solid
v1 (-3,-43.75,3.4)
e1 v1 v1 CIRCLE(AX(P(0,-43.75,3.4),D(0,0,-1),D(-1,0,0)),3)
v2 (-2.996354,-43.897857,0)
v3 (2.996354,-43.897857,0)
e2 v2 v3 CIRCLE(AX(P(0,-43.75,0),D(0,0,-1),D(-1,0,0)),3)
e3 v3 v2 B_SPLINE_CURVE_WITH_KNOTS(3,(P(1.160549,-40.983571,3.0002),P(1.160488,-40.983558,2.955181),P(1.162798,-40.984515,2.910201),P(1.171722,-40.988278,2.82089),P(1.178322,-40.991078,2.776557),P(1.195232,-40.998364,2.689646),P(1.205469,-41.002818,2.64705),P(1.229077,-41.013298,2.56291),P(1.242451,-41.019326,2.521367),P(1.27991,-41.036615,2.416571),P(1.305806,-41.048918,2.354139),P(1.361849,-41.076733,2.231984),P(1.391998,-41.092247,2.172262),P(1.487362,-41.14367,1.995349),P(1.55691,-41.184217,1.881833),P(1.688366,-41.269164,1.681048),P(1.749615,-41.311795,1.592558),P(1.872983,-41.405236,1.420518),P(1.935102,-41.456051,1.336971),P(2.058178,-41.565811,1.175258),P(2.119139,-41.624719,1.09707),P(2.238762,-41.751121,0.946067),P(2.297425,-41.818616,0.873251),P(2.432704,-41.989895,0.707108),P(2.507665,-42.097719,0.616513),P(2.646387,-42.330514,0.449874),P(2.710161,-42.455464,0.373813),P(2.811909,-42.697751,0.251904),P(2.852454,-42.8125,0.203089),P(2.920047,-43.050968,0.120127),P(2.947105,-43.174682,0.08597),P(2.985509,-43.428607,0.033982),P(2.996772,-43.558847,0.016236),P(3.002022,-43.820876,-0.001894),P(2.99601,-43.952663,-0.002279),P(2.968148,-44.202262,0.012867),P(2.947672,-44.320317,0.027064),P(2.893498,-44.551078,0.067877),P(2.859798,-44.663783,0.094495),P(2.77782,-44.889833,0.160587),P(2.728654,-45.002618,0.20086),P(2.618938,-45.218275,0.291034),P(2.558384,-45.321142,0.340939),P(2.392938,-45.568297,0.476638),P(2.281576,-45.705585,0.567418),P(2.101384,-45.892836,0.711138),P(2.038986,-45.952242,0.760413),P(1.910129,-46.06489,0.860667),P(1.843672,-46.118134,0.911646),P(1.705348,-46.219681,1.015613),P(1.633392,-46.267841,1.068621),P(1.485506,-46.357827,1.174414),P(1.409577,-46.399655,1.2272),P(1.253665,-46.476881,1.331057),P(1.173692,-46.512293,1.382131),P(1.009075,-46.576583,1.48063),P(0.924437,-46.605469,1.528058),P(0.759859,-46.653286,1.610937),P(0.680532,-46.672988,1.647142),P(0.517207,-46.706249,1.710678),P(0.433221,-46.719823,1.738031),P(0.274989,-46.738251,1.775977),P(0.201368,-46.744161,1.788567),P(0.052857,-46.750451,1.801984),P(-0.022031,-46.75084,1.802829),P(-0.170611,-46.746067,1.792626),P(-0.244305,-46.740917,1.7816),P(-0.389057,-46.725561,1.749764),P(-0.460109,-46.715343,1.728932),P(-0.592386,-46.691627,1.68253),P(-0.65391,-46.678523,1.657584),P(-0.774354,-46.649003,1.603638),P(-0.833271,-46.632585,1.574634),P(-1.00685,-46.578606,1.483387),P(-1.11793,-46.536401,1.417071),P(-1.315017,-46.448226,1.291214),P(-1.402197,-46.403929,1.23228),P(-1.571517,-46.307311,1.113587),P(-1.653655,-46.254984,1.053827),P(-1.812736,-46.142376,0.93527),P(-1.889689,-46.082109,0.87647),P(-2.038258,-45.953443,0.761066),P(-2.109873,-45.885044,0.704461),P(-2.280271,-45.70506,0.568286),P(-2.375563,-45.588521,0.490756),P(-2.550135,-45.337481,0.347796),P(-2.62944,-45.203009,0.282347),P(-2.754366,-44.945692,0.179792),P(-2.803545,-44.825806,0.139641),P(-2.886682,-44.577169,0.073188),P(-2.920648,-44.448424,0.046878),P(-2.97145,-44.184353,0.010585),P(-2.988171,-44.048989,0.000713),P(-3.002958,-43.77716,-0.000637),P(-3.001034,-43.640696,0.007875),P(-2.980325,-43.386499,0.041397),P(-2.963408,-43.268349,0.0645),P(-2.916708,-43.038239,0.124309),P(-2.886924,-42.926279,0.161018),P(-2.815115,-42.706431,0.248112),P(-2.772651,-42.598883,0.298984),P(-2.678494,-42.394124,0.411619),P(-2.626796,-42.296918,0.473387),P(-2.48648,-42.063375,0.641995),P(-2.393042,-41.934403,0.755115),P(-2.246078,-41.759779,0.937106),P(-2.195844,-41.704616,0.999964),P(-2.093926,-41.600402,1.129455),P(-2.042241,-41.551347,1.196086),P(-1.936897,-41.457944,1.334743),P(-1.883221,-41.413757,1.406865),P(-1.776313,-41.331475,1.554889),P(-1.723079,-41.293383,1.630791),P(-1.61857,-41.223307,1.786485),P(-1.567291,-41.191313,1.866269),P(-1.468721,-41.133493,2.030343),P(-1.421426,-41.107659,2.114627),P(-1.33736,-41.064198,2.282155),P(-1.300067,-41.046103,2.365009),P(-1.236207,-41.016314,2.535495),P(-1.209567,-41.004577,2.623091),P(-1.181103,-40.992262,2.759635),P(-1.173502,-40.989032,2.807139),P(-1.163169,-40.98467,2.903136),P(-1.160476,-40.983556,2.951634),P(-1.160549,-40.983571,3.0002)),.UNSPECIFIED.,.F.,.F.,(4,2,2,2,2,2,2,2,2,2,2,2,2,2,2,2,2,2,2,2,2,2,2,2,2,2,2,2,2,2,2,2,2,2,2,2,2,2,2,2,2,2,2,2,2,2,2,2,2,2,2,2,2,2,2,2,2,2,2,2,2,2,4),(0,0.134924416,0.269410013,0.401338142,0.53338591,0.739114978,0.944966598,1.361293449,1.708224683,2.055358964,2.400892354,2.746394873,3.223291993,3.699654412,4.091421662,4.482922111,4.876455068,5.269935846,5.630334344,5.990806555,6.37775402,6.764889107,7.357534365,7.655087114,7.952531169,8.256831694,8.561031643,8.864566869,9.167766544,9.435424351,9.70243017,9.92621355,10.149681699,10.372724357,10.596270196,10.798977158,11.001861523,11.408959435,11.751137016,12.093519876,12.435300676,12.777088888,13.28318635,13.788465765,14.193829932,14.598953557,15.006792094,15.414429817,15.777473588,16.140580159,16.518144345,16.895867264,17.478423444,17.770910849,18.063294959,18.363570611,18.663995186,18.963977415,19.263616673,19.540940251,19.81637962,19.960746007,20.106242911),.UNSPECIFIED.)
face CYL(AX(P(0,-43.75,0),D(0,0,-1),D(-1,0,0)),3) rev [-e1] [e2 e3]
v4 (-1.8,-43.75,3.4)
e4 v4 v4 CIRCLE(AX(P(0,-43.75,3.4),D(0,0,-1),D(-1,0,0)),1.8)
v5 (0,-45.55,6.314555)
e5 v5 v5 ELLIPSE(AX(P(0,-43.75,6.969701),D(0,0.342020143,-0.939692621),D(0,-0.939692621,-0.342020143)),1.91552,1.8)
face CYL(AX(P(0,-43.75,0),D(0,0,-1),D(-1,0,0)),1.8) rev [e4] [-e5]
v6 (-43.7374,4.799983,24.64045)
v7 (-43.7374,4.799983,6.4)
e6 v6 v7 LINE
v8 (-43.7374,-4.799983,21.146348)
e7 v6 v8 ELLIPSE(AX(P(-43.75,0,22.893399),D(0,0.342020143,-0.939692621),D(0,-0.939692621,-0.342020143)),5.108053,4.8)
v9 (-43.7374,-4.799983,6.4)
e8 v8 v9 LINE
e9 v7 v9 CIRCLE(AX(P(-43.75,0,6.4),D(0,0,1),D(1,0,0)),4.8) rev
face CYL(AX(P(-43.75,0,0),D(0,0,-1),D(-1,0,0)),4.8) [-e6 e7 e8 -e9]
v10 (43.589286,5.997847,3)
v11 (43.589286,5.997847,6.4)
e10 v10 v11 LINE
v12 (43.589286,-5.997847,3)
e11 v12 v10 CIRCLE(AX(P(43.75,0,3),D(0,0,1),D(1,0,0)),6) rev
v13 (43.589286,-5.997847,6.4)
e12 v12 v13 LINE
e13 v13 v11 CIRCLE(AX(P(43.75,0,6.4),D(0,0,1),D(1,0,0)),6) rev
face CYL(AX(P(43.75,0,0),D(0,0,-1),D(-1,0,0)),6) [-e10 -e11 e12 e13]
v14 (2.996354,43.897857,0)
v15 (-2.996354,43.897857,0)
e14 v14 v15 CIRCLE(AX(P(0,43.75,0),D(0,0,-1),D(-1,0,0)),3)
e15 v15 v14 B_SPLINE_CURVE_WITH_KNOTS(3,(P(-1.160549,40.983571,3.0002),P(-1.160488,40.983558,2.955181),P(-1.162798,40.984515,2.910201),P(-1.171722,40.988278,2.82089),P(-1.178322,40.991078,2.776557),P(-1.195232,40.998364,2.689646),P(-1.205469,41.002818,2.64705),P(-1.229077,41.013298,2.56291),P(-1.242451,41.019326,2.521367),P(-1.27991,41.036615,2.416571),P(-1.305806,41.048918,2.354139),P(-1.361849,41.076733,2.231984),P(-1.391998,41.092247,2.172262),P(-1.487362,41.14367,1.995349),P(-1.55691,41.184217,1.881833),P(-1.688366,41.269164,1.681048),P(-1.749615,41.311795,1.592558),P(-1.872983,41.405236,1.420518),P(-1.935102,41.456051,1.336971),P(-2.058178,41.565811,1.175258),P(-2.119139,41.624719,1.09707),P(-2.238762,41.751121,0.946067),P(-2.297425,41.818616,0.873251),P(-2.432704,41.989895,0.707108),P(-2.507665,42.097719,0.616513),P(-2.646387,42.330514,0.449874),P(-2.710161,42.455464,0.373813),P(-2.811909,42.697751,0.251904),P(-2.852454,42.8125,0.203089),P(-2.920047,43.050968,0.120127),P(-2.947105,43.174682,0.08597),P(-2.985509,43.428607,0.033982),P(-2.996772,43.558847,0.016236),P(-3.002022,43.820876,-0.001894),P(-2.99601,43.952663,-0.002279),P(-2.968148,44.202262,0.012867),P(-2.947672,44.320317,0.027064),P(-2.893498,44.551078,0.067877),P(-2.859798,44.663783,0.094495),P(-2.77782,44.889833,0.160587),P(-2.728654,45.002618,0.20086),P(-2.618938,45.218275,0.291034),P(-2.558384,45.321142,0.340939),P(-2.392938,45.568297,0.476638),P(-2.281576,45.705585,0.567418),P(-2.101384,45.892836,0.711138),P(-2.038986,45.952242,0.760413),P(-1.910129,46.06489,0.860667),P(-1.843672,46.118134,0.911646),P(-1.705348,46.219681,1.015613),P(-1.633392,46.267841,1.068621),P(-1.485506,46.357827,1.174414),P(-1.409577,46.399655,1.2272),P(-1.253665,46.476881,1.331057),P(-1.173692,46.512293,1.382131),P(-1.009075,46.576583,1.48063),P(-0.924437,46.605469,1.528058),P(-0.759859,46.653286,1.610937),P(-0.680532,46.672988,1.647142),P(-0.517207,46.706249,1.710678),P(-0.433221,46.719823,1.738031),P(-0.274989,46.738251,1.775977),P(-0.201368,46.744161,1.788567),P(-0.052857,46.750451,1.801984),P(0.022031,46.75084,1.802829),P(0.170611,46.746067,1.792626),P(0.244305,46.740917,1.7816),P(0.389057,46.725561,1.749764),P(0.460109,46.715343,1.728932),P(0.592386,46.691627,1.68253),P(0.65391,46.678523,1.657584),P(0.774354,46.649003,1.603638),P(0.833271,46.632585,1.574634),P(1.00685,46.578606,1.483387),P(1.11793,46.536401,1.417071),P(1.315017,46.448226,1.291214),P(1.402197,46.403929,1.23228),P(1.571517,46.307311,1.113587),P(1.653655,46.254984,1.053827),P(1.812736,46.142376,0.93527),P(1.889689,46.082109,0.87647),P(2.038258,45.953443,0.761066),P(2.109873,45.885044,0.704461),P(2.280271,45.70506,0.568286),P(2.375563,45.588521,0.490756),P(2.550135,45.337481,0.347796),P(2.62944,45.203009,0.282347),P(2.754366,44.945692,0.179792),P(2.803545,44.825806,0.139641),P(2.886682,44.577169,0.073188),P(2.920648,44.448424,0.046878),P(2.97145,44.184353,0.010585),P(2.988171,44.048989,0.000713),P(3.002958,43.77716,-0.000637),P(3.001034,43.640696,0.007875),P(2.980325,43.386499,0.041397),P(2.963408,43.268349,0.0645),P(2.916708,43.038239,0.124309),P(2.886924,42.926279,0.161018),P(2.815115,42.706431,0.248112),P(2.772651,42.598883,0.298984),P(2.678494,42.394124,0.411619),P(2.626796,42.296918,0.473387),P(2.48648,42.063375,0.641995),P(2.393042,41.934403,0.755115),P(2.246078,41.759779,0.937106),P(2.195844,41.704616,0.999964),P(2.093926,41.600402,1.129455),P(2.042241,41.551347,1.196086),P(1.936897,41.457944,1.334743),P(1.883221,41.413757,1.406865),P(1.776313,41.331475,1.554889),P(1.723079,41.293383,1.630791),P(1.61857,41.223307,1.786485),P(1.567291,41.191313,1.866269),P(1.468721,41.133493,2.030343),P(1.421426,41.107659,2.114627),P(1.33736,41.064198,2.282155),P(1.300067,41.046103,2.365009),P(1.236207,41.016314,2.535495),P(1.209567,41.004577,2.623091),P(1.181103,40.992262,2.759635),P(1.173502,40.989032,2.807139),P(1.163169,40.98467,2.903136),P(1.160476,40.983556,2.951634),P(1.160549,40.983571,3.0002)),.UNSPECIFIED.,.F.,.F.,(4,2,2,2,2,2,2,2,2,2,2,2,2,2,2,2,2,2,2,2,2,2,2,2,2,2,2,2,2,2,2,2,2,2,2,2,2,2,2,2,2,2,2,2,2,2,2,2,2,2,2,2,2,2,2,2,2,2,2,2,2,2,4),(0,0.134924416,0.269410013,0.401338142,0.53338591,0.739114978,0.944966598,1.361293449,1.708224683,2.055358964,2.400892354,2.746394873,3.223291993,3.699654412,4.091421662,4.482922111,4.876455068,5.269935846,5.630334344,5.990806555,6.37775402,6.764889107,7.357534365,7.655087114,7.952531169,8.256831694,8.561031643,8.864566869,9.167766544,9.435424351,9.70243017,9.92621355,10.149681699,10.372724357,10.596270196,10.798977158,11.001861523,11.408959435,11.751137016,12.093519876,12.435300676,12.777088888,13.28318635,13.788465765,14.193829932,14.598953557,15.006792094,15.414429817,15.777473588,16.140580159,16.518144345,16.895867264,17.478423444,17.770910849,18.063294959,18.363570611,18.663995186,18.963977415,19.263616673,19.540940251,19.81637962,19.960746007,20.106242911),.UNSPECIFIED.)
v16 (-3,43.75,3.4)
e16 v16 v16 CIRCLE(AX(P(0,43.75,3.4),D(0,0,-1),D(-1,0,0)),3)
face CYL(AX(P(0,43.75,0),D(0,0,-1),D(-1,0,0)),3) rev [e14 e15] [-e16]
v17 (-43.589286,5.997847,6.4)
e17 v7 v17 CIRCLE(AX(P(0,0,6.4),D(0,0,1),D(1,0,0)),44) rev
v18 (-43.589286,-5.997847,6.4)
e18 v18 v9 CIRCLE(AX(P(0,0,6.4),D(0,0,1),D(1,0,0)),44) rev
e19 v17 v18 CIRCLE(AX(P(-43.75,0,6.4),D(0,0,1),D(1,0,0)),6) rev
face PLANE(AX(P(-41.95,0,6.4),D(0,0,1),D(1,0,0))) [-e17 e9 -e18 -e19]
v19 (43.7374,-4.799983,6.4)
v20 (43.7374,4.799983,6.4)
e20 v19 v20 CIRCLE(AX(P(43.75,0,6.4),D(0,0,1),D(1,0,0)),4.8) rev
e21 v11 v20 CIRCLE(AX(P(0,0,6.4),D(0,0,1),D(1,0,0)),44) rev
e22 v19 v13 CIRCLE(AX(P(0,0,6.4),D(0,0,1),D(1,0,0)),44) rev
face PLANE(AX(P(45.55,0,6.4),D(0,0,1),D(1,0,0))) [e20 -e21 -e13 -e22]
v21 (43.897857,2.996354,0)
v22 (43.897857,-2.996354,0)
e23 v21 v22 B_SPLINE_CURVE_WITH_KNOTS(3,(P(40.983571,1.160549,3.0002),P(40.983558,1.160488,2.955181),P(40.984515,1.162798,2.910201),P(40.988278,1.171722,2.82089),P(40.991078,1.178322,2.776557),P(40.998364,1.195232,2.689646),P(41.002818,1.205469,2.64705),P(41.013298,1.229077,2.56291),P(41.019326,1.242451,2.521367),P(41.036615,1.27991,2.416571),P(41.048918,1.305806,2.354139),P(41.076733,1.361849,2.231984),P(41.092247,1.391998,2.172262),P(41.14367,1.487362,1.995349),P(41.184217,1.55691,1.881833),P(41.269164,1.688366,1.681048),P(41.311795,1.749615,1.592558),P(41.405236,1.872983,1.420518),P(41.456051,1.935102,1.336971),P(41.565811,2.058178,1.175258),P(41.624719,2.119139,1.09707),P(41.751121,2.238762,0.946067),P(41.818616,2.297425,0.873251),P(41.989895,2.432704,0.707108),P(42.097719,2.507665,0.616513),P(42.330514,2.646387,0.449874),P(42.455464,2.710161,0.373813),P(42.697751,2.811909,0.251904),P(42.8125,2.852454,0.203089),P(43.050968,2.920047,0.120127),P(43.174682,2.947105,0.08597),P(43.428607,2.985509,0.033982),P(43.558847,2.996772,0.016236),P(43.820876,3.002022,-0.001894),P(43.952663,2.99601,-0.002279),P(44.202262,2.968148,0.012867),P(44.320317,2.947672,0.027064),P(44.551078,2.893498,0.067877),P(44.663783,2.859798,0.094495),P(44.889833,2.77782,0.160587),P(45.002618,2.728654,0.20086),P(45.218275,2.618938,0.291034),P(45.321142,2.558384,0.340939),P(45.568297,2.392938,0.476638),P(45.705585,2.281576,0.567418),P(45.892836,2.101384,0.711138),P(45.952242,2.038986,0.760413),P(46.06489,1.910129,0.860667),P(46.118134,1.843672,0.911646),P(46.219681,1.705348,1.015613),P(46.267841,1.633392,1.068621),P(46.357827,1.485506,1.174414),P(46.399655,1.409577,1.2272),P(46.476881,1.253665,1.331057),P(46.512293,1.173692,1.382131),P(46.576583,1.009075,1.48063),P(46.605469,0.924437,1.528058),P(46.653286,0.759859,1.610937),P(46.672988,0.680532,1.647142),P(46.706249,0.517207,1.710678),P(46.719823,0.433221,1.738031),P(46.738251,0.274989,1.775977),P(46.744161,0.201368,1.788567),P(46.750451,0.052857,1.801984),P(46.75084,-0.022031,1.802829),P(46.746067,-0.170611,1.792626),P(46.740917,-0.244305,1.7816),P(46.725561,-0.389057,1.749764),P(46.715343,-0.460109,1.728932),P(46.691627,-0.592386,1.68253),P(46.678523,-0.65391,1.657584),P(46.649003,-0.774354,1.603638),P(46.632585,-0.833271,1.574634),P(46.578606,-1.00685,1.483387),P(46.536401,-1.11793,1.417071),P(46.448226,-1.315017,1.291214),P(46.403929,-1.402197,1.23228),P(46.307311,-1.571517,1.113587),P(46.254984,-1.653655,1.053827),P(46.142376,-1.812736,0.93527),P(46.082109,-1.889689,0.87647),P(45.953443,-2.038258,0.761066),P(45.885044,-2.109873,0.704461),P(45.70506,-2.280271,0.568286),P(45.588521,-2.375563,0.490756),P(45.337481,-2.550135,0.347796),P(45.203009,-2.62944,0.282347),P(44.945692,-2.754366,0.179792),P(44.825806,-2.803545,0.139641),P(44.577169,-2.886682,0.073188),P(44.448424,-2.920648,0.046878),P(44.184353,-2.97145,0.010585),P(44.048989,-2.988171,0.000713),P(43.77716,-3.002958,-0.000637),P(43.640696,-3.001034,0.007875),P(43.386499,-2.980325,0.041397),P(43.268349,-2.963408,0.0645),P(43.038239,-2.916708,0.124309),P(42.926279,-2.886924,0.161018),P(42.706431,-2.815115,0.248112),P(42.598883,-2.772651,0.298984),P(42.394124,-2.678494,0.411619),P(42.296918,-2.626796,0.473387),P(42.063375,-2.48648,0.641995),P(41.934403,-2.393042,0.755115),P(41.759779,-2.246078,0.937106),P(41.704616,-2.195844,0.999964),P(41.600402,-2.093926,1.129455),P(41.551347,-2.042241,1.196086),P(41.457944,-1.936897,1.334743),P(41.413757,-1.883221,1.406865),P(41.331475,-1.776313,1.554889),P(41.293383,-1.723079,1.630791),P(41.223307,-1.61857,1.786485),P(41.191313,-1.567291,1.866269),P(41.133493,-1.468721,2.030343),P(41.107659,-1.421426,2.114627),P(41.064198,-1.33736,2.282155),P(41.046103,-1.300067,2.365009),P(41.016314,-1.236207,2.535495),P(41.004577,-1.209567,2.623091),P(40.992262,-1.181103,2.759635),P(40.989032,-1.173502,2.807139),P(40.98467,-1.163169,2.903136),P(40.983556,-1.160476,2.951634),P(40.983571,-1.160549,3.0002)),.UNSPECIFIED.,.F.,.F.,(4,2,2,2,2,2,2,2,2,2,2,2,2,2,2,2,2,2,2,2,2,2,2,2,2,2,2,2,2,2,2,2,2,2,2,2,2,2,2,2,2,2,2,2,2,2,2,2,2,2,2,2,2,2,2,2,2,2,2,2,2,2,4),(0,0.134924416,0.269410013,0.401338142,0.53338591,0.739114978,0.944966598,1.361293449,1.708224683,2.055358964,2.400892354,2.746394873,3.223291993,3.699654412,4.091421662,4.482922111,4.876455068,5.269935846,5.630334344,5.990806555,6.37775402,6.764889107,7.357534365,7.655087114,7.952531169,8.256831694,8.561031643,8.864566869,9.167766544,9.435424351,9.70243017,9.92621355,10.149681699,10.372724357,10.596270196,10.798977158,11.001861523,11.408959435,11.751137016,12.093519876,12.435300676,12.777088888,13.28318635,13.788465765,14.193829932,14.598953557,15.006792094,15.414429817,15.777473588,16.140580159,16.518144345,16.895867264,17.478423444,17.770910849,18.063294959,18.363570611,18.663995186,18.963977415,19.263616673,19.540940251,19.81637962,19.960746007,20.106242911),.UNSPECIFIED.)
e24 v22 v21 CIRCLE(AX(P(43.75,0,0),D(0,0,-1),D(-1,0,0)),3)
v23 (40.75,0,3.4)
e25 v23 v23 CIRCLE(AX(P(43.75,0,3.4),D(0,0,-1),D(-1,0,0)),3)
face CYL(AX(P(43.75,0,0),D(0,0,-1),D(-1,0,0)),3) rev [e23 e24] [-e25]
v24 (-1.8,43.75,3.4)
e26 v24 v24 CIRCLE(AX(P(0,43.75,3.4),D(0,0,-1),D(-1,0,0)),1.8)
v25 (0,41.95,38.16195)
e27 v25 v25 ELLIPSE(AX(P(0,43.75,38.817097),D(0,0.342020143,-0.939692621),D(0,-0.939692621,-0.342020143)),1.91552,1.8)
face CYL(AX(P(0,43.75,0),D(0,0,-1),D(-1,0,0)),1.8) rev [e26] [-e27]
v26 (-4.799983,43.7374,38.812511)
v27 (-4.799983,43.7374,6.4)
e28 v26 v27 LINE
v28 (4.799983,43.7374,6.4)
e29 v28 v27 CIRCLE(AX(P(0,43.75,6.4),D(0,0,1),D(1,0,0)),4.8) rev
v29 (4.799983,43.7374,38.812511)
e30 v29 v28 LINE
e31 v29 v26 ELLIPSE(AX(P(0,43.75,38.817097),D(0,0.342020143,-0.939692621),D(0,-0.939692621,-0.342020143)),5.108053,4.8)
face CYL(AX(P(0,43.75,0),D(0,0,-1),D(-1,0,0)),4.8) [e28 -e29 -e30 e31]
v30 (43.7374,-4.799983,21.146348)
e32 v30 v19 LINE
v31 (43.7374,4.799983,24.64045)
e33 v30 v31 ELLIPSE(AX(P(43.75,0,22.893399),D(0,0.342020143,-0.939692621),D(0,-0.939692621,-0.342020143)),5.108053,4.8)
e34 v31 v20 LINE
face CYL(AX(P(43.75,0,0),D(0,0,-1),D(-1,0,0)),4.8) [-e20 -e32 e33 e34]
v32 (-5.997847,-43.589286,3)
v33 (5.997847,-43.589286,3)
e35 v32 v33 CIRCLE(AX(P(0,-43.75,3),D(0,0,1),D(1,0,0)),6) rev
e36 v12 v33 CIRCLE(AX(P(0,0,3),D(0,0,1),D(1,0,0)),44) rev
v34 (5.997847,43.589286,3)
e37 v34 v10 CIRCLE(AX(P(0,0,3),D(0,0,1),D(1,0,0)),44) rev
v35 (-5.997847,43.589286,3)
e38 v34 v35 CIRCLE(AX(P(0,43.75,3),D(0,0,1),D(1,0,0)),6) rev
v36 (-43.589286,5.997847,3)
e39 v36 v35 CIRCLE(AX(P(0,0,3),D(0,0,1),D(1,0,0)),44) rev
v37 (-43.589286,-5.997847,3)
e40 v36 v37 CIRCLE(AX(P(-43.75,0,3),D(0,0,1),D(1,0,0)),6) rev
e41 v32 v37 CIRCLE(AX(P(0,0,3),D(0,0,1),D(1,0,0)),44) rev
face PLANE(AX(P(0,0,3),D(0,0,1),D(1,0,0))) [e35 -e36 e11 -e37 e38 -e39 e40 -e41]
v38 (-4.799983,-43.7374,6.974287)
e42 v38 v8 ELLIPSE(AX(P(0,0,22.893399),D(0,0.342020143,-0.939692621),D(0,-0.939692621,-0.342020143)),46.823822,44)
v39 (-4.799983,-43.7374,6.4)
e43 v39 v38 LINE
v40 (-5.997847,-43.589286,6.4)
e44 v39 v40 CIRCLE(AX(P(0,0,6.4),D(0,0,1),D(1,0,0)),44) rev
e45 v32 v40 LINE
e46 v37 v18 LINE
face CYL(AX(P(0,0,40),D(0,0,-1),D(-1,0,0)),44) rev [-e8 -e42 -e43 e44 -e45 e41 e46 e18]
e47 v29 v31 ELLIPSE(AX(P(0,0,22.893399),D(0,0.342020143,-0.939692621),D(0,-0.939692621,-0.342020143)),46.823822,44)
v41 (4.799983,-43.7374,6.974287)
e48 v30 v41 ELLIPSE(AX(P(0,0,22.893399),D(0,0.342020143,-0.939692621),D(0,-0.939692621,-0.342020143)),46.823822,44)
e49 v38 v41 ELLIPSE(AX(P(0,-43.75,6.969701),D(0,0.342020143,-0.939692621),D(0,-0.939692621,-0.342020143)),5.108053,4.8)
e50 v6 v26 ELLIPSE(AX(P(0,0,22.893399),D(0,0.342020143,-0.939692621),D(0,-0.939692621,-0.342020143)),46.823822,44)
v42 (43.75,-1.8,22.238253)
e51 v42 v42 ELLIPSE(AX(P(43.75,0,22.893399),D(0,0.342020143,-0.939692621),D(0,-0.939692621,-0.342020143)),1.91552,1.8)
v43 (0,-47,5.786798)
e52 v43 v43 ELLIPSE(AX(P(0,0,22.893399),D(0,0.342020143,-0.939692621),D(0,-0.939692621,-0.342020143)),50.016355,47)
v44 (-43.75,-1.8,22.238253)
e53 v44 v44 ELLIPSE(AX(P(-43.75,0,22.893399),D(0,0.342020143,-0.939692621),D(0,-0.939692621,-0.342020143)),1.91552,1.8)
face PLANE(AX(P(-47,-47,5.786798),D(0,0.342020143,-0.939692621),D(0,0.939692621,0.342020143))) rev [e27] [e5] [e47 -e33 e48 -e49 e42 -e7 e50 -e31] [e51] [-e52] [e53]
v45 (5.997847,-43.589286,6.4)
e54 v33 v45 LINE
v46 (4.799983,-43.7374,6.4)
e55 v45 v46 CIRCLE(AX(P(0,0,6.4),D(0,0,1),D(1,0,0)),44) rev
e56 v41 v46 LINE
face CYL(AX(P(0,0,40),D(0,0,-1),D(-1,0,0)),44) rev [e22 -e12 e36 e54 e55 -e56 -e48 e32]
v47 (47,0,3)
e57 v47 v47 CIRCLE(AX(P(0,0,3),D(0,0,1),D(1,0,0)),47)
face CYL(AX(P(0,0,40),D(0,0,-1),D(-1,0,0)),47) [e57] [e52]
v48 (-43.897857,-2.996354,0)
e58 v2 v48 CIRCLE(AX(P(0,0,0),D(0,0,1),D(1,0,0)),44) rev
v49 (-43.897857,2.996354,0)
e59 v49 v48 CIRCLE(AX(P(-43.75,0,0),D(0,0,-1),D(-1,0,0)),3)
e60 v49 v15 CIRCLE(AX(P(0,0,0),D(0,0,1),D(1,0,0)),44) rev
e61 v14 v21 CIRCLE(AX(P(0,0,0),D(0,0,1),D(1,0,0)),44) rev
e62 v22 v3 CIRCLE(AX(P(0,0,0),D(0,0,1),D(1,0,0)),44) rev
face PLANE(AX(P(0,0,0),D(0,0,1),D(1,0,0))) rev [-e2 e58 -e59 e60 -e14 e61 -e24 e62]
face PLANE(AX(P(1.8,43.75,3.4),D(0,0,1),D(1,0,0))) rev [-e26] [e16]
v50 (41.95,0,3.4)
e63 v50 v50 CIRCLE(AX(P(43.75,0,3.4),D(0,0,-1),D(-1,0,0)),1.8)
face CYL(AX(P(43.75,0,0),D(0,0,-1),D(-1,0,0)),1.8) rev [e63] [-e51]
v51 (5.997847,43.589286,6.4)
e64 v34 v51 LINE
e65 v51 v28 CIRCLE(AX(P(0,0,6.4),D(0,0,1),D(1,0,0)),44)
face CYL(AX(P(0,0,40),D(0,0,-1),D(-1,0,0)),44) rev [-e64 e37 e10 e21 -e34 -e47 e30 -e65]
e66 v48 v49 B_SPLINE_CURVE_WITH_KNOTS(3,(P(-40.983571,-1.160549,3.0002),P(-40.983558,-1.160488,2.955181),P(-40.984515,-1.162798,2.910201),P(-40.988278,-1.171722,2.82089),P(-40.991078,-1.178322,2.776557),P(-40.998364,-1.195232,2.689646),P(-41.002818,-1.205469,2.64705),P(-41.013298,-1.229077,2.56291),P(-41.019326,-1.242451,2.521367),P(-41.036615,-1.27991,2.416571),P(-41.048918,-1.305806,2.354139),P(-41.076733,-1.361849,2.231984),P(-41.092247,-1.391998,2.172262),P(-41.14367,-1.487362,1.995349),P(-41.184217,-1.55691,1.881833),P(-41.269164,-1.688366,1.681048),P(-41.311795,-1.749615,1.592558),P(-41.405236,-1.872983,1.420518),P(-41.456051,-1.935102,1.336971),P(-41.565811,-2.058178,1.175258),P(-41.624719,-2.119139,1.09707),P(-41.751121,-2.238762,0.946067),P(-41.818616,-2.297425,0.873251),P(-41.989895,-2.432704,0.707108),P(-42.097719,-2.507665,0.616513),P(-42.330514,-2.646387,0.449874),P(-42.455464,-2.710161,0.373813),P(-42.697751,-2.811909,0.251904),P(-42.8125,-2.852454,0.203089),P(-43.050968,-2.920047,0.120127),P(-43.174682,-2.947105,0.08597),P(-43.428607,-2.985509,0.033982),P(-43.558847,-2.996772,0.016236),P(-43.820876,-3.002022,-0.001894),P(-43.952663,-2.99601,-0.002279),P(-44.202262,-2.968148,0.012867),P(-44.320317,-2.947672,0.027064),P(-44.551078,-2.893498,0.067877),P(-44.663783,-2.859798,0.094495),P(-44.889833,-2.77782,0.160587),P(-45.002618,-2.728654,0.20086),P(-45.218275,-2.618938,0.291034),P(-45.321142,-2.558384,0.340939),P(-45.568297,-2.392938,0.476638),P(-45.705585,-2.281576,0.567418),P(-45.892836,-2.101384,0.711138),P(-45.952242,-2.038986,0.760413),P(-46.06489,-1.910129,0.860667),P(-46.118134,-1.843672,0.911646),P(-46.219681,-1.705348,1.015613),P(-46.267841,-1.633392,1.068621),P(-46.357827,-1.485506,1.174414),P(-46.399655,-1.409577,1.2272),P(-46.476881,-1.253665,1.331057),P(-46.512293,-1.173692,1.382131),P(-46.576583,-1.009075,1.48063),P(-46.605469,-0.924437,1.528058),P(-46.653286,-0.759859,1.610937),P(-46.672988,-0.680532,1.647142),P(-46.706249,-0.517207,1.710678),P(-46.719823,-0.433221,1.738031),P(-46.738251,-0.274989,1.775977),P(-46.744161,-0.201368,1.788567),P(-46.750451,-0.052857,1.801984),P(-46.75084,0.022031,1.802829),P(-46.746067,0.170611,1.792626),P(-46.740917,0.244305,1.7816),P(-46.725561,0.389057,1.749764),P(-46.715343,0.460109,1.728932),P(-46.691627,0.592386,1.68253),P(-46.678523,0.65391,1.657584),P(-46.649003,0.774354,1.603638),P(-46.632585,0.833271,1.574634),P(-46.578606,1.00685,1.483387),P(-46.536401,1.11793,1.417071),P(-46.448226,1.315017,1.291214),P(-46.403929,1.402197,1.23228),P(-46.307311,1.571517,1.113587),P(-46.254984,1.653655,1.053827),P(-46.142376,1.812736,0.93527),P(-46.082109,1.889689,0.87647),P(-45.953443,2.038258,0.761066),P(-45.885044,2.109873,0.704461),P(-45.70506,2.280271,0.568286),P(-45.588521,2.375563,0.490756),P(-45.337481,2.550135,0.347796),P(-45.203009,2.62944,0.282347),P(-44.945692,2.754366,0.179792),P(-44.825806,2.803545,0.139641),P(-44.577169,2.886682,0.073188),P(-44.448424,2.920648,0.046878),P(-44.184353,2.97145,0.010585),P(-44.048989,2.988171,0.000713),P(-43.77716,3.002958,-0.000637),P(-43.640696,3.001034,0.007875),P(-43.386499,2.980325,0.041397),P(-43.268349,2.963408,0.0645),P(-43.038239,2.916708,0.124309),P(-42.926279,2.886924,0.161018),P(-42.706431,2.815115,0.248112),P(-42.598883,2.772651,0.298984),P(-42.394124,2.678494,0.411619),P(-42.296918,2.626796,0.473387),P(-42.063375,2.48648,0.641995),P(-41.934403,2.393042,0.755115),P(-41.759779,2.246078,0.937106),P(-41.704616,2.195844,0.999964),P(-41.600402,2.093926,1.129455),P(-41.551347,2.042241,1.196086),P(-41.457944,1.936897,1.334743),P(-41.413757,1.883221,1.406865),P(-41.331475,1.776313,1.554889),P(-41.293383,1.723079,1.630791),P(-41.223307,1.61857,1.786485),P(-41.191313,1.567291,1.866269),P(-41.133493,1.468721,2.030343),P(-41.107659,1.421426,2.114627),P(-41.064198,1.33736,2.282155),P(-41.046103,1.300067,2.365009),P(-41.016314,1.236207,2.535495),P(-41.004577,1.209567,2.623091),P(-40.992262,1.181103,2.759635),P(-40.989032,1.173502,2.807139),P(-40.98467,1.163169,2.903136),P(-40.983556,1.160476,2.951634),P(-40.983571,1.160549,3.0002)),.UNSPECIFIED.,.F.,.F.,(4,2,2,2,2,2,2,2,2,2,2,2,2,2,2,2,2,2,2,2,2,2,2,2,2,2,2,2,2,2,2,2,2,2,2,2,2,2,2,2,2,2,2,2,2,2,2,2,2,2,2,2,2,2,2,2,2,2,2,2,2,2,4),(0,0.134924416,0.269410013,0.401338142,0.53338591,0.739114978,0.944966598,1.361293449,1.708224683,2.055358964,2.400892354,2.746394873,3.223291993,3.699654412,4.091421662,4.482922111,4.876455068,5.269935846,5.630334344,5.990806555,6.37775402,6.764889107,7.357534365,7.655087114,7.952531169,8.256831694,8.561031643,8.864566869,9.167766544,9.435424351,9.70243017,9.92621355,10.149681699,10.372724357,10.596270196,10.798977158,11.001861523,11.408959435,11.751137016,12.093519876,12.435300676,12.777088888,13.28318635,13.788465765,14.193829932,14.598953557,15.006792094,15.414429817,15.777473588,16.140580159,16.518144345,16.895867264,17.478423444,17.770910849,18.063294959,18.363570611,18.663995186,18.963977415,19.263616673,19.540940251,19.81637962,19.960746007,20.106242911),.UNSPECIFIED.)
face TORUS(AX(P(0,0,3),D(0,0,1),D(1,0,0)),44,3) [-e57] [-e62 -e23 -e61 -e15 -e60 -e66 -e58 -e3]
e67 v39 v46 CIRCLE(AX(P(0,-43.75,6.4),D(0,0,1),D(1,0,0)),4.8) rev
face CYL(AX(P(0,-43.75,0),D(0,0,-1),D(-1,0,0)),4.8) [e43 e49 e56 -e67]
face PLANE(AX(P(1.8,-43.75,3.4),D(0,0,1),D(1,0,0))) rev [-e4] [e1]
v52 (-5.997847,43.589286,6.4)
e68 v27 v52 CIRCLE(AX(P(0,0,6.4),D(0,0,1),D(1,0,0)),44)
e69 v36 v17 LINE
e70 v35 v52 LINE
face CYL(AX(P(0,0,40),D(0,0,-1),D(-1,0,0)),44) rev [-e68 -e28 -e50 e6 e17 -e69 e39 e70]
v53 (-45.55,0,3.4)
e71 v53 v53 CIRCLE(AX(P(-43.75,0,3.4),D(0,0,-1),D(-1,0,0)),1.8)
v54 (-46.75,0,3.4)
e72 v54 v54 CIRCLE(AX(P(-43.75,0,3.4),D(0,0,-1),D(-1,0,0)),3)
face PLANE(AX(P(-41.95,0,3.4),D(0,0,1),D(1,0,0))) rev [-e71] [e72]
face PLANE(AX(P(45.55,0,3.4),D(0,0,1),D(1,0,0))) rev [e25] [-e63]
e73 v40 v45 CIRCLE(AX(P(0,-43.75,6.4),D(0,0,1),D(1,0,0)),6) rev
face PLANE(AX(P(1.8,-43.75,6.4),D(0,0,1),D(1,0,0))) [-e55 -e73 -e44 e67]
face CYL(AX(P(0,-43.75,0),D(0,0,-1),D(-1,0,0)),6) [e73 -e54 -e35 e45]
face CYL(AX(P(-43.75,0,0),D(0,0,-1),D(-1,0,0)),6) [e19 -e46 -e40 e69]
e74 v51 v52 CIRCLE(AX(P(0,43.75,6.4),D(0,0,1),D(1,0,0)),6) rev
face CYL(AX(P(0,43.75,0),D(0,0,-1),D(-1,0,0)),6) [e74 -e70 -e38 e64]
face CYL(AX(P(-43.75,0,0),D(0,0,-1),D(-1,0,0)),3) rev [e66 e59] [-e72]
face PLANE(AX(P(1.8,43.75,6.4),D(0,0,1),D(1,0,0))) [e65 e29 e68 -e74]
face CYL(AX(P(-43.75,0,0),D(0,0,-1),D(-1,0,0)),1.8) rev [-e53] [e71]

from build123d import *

# Parameters (mm, degrees)
SKETCH_1_R                = 47
EXTRUDE_1_DEPTH           = 40
CUT_EXTRUDE_1_DEPTH       = 78.575769413
CUT_EXTRUDE_1_DEPTH_BACK  = 78.575769413
FILLET_1_R                = 3
HOLE_WIZARD_1_D           = 3.6
HOLE_WIZARD_1_CBORE_D     = 6
HOLE_WIZARD_1_CBORE_DEPTH = 3.4
PATTERN_CIRCULAR_1_COUNT  = 4
SHELL_START               = 3
SHELL_1_DEPTH             = 35.812510714
SHELL_START_2             = 6.4
SHELL_1_2_DEPTH           = 32.412510714


# Read off the part's stored shape, not the designer's step: 抽壳1
with BuildPart() as part:
    # 草图1 → 凸台-拉伸1 (new body)
    with BuildSketch(Plane.XY):
        Circle(SKETCH_1_R)
    extrude(amount=EXTRUDE_1_DEPTH)

    # 草图2 → 切除-拉伸1 (cut, two sides: drawn at the far end of the back side and taken through both)
    with BuildSketch(Plane(origin=(0, 0, 0), x_dir=(0, 0, -1), z_dir=(1, 0, 0)).offset(-CUT_EXTRUDE_1_DEPTH_BACK)):
        Polygon((-40, 47), (-40, -47), (-5.786797979, -47), align=None)
    extrude(amount=CUT_EXTRUDE_1_DEPTH + CUT_EXTRUDE_1_DEPTH_BACK, mode=Mode.SUBTRACT)

    # 圆角1
    fillet_1_edges = [part.edges().sort_by_distance(p)[0] for p in [
        (-47, 0, 0),
    ]]
    fillet(fillet_1_edges, radius=FILLET_1_R)

    # 打孔尺寸(%根据)内六角圆柱头螺钉的类型1 (through all)
    with Locations(Plane(origin=(0, 0, 0), x_dir=(-1, 0, 0), z_dir=(0, 0, -1))):
        with Locations((0, 43.75)):
            hole_wizard_1 = CounterBoreHole(HOLE_WIZARD_1_D / 2, HOLE_WIZARD_1_CBORE_D / 2, HOLE_WIZARD_1_CBORE_DEPTH)

    # 阵列(圆周)1: 打孔尺寸(%根据)内六角圆柱头螺钉的类型1 ×4 about axis
    pattern_circular_1_axis = Axis((0, 0, 0), (0, 0, 1))
    for i in range(1, PATTERN_CIRCULAR_1_COUNT):
        add(hole_wizard_1.rotate(pattern_circular_1_axis, i * 360 / PATTERN_CIRCULAR_1_COUNT), mode=Mode.SUBTRACT)

    # 抽壳1 outline → 抽壳1 (cut)
    with BuildSketch(Plane.XY.offset(SHELL_START)):
        with BuildLine():
            ThreePointArc((-43.589285714, -5.99784719), (-31.112698372, -31.112698372), (-5.99784719, -43.589285714))
            ThreePointArc((-5.99784719, -43.589285714), (0, -37.75), (5.99784719, -43.589285714))
            ThreePointArc((5.99784719, -43.589285714), (31.112698372, -31.112698372), (43.589285714, -5.99784719))
            ThreePointArc((43.589285714, -5.99784719), (37.75, 0), (43.589285714, 5.99784719))
            ThreePointArc((43.589285714, 5.99784719), (31.112698372, 31.112698372), (5.99784719, 43.589285714))
            ThreePointArc((5.99784719, 43.589285714), (0, 37.75), (-5.99784719, 43.589285714))
            ThreePointArc((-5.99784719, 43.589285714), (-31.112698372, 31.112698372), (-43.589285714, 5.99784719))
            ThreePointArc((-43.589285714, 5.99784719), (-37.75, 0), (-43.589285714, -5.99784719))
        make_face()
    extrude(amount=SHELL_1_DEPTH, mode=Mode.SUBTRACT)

    # Shell 1 2 outline → Shell 1 2 (cut)
    with BuildSketch(Plane.XY.offset(SHELL_START_2)):
        with BuildLine():
            ThreePointArc((5.99784719, -43.589285714), (0, -37.75), (-5.99784719, -43.589285714))
            ThreePointArc((-5.99784719, -43.589285714), (-5.399423225, -43.66745045), (-4.799983462, -43.7374))
            ThreePointArc((-4.799983462, -43.7374), (0, -38.95), (4.799983462, -43.7374))
            ThreePointArc((4.799983462, -43.7374), (5.399423225, -43.66745045), (5.99784719, -43.589285714))
        make_face()
        with BuildLine():
            ThreePointArc((-43.7374, -4.799983462), (-43.66745045, -5.399423225), (-43.589285714, -5.99784719))
            ThreePointArc((-43.589285714, -5.99784719), (-37.75, 0), (-43.589285714, 5.99784719))
            ThreePointArc((-43.589285714, 5.99784719), (-43.66745045, 5.399423225), (-43.7374, 4.799983462))
            ThreePointArc((-43.7374, 4.799983462), (-38.95, 0), (-43.7374, -4.799983462))
        make_face()
        with BuildLine():
            ThreePointArc((43.589285714, 5.99784719), (37.75, 0), (43.589285714, -5.99784719))
            ThreePointArc((43.589285714, -5.99784719), (43.66745045, -5.399423225), (43.7374, -4.799983462))
            ThreePointArc((43.7374, -4.799983462), (38.95, 0), (43.7374, 4.799983462))
            ThreePointArc((43.7374, 4.799983462), (43.66745045, 5.399423225), (43.589285714, 5.99784719))
        make_face()
        with BuildLine():
            ThreePointArc((-4.799983462, 43.7374), (-5.399423225, 43.66745045), (-5.99784719, 43.589285714))
            ThreePointArc((-5.99784719, 43.589285714), (0, 37.75), (5.99784719, 43.589285714))
            ThreePointArc((5.99784719, 43.589285714), (5.399423225, 43.66745045), (4.799983462, 43.7374))
            ThreePointArc((4.799983462, 43.7374), (0, 38.95), (-4.799983462, 43.7374))
        make_face()
    extrude(amount=SHELL_1_2_DEPTH, mode=Mode.SUBTRACT)


solid = part.part
